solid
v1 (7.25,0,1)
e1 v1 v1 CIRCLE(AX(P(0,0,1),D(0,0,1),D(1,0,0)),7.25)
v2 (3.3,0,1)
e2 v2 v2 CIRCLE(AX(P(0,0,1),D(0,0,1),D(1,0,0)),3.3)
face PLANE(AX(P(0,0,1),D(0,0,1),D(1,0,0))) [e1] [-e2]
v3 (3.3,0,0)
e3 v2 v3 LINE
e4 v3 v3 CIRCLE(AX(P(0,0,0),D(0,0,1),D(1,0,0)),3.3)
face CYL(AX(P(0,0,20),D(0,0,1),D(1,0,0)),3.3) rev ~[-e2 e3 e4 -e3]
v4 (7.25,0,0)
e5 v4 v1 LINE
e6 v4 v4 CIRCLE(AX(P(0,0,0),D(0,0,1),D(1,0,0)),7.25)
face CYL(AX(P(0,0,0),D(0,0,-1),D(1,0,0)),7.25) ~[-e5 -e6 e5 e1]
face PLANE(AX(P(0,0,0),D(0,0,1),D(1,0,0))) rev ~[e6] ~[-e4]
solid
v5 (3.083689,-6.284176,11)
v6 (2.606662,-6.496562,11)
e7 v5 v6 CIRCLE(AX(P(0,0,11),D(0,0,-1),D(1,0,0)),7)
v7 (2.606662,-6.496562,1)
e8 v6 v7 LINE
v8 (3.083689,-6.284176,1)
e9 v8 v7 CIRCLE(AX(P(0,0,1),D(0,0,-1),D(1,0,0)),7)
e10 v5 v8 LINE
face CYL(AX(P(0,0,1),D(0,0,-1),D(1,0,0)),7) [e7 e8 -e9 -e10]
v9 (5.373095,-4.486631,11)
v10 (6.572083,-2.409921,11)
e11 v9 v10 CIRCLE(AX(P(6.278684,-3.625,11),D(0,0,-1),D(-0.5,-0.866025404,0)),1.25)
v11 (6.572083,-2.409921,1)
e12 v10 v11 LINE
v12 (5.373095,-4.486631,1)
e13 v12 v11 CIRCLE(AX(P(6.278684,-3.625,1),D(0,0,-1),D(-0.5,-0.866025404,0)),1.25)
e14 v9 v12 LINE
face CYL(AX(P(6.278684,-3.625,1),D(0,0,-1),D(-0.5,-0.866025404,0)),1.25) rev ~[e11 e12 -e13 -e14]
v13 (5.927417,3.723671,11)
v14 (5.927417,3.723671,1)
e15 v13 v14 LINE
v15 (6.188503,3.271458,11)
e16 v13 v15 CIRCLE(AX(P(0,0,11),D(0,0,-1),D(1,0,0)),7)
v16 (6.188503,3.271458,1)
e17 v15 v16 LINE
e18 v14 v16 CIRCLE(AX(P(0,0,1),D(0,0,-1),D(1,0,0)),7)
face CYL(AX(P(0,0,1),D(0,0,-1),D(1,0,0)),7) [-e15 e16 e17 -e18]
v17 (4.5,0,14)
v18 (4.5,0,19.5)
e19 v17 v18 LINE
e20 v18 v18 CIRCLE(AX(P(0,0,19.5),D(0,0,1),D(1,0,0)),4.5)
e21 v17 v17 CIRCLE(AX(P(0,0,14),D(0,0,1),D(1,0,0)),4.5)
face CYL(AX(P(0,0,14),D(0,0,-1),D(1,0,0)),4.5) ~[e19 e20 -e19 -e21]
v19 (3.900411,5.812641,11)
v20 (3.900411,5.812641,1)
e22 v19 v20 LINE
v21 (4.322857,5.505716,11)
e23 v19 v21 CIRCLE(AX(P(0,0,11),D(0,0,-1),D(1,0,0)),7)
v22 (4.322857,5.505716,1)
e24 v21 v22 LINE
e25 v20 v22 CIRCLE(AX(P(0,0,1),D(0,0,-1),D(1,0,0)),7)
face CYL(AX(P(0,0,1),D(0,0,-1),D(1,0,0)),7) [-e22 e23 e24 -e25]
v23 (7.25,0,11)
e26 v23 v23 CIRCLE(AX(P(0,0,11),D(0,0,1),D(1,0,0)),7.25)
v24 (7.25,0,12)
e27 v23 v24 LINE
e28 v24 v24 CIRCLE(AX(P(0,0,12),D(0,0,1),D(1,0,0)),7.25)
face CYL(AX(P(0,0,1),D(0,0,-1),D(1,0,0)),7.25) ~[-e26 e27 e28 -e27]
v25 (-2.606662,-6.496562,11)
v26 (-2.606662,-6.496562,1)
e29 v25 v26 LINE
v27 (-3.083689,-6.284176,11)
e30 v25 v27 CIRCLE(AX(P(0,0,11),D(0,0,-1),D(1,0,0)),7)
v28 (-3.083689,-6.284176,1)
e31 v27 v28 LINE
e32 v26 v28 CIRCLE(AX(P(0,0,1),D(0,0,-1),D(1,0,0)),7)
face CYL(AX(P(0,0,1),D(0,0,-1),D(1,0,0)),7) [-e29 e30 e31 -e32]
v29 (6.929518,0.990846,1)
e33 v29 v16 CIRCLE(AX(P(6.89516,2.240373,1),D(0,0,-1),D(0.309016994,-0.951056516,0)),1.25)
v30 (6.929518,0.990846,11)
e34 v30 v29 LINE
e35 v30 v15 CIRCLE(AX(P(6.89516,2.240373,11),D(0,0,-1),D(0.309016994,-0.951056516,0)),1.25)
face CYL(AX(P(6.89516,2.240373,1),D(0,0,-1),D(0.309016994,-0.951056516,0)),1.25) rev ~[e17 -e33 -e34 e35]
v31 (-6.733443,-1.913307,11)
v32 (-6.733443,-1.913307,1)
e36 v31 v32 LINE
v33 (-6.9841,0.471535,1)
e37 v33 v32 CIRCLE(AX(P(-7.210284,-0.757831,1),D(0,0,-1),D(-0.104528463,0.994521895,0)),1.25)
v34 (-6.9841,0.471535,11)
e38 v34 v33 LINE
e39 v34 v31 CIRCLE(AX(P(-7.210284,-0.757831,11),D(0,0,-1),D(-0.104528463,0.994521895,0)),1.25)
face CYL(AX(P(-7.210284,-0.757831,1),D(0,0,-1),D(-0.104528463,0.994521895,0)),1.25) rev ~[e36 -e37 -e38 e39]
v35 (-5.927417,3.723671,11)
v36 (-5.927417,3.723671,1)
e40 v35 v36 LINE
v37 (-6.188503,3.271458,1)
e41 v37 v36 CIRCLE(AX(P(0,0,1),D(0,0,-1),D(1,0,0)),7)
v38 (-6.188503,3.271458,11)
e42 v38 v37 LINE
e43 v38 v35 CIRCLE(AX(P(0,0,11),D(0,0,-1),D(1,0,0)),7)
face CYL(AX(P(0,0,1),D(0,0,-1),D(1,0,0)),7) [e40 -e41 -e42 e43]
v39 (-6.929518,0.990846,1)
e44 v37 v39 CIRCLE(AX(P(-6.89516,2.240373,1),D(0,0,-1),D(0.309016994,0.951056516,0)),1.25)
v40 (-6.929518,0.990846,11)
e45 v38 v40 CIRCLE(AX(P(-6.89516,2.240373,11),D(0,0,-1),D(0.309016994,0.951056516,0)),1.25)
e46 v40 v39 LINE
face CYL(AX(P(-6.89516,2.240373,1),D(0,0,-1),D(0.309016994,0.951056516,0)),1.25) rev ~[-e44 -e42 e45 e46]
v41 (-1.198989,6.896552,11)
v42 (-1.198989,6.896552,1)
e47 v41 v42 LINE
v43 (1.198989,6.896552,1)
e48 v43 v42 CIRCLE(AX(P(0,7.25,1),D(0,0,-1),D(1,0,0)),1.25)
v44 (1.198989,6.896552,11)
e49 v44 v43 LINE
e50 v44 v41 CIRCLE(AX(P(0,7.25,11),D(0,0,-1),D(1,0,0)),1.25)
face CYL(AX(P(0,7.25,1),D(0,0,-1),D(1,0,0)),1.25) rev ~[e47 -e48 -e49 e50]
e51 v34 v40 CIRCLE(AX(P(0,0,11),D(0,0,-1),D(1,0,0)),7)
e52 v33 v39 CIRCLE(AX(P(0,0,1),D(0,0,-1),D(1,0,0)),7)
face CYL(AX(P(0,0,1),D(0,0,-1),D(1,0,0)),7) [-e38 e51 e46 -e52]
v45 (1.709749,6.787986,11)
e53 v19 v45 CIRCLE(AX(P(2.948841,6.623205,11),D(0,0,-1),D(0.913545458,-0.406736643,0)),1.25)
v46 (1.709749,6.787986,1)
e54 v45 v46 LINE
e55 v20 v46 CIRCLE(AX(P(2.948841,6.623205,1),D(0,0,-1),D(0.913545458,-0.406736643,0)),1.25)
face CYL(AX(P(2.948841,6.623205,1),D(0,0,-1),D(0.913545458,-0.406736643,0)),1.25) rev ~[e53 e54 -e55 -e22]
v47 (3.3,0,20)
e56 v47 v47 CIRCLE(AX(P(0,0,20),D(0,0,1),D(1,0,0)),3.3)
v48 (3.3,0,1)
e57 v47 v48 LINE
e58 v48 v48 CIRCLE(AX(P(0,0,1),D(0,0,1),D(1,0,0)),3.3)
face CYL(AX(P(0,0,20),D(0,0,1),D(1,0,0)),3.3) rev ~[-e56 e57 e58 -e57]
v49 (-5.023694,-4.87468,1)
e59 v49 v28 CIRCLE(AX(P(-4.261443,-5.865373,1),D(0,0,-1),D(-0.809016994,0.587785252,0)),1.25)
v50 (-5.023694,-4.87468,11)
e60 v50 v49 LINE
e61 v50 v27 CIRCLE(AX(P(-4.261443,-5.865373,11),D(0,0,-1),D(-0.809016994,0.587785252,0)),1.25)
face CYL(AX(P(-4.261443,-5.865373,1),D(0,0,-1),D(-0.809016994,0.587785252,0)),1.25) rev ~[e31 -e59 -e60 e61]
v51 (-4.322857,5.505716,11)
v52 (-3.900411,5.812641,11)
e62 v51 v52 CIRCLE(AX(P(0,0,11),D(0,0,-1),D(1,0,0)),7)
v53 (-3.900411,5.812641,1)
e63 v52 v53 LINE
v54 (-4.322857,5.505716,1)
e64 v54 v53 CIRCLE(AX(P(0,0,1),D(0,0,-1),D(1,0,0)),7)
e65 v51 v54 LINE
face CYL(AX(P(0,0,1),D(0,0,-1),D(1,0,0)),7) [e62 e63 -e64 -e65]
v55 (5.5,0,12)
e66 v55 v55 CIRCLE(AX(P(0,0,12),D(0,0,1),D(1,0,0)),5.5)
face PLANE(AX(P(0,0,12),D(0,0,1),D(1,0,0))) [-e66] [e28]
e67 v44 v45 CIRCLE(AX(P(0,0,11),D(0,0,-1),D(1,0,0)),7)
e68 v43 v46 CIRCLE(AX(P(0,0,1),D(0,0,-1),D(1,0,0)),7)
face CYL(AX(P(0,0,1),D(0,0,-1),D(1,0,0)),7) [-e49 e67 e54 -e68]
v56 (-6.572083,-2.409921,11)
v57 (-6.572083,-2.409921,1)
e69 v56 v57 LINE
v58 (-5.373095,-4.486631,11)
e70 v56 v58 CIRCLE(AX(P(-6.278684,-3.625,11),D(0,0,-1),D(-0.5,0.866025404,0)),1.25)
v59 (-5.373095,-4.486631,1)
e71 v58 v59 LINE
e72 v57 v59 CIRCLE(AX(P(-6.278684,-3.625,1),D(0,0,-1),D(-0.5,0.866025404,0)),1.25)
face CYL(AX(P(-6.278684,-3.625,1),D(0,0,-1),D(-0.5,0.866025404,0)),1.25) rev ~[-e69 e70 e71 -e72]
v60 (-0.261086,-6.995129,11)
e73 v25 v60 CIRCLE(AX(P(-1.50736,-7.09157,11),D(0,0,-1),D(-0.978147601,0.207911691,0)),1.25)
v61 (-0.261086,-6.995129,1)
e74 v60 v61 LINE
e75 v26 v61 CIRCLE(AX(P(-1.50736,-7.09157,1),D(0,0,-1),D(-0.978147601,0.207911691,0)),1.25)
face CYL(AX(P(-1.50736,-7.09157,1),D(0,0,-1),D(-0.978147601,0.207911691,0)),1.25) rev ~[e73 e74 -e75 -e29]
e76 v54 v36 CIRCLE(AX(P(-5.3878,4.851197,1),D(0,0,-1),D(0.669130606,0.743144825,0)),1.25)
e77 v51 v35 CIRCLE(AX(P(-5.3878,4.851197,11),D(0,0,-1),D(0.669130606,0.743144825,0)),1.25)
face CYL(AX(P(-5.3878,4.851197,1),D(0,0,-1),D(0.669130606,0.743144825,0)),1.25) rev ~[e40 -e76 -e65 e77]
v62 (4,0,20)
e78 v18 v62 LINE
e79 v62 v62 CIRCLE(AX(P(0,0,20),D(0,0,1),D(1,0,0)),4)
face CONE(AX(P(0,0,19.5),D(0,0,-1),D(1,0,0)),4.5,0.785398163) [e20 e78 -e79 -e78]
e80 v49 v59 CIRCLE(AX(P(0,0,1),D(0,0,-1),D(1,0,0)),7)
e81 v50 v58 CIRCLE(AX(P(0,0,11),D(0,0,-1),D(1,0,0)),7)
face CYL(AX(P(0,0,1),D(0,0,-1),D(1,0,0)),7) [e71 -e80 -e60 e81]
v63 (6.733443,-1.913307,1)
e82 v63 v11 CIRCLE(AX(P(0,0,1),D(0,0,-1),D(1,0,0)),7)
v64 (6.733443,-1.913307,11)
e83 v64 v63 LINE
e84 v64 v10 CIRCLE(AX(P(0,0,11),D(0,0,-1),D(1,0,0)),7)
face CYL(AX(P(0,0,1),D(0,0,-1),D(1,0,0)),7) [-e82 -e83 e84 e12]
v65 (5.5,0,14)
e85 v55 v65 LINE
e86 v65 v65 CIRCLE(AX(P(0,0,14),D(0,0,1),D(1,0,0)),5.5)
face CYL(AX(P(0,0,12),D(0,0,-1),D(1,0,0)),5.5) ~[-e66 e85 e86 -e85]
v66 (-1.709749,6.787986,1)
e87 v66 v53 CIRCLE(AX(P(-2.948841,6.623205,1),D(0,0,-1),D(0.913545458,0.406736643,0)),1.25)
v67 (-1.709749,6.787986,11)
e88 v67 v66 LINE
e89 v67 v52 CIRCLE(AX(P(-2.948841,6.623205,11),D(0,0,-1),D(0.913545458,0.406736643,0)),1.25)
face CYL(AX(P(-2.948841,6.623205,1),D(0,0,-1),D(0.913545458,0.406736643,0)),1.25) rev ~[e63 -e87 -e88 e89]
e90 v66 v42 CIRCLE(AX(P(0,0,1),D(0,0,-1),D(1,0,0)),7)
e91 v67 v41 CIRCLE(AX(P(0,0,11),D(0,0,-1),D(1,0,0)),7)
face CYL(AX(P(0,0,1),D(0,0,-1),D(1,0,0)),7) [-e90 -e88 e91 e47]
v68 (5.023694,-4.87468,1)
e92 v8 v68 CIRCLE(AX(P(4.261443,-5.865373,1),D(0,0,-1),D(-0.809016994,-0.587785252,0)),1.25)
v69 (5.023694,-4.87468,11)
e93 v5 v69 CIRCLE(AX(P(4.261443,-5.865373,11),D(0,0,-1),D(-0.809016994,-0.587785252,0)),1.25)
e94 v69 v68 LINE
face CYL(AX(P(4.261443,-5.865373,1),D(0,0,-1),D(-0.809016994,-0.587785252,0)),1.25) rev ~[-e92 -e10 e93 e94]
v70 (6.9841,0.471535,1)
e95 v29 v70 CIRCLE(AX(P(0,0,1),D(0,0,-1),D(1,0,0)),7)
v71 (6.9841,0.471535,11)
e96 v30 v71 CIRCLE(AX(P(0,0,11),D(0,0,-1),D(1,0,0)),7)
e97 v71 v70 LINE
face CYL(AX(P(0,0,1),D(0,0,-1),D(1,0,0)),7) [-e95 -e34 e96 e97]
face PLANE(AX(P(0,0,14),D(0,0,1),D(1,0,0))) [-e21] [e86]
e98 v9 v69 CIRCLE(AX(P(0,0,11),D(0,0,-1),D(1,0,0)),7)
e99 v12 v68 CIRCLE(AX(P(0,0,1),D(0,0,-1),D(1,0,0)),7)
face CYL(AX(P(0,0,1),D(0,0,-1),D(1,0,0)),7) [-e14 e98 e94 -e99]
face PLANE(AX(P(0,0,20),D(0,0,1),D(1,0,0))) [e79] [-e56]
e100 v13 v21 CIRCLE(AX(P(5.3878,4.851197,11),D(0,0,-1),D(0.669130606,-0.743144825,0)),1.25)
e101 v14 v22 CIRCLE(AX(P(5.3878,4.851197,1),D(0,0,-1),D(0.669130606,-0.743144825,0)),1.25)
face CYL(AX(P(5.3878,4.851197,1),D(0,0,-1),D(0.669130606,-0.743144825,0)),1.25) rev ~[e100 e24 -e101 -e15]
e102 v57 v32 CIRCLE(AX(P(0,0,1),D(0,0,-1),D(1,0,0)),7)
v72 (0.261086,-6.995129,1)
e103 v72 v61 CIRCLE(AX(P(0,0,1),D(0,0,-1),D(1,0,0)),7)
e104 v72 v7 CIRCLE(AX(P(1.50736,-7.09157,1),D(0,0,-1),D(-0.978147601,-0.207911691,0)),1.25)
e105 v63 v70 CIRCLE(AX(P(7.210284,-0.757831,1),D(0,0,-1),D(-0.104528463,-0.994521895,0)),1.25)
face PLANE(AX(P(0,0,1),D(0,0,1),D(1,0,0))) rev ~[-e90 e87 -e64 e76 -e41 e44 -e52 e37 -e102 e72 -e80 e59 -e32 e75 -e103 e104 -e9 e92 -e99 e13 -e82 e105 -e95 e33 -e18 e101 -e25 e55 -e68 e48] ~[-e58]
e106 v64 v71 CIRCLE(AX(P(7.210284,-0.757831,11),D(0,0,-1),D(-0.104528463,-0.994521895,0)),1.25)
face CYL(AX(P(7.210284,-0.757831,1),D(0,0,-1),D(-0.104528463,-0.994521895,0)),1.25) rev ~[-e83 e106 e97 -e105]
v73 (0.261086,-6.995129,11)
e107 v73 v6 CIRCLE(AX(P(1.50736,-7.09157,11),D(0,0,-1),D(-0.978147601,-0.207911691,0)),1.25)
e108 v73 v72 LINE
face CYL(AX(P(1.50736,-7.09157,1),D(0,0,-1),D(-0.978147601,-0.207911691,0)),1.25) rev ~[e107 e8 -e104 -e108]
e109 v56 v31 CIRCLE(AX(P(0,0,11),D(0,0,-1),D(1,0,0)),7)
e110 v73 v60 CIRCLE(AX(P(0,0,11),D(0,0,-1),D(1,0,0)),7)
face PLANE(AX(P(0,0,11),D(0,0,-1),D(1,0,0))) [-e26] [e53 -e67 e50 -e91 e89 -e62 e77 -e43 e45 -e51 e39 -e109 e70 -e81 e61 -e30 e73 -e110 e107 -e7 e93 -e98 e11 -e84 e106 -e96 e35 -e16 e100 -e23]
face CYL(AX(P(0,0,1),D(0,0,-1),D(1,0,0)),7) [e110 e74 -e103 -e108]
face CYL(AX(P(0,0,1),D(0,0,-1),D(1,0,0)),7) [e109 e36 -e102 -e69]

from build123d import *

# Parameters (mm, degrees)
F0_R            = 7.25
F1_DEPTH        = 1
F2_R            = 7.25
F3_DEPTH        = 11
F4_R            = 1.25
F5_DEPTH        = 10
F5_COPIES_COUNT = 15
F6_R            = 7.25
F6_R_2          = 7
F7_DEPTH        = 10
F8_R            = 5.5
F9_DEPTH        = 2
F10_R           = 4.5
F11_DEPTH       = 6
F12_R           = 3.3
F13_DEPTH       = 25
F14_SIZE        = 0.5


# Not quite as in the source:
# - a pattern or mirror of a feature is missing from the dataset's text; its kind, count and spacing are read off the source's solid


with BuildPart() as f1:
    # F0 (on Top) → F1 (new body)
    with BuildSketch(Plane.XY):
        Circle(F0_R)
    extrude(amount=F1_DEPTH)


with BuildPart() as f3:
    # F2 (on face) → F3 (new body)
    with BuildSketch(Plane.XY.offset(1)):
        Circle(F2_R)
    extrude(amount=F3_DEPTH)

    # F4 (on face) → F5 (cut)
    with BuildSketch(Plane(origin=(0, 0, 1), x_dir=(1, 0, 0), z_dir=(0, 0, -1))):
        with Locations((0, -7.25)):
            Circle(F4_R)
    f5 = extrude(amount=-F5_DEPTH, mode=Mode.SUBTRACT)

    # F5_copies: F5 ×15 about axis
    f5_copies_axis = Axis((0, 0, 0), (0, 0, 1))
    for i in range(1, F5_COPIES_COUNT):
        add(f5.rotate(f5_copies_axis, i * 360 / F5_COPIES_COUNT), mode=Mode.SUBTRACT)

    # F6 (on face) → F7 (cut)
    with BuildSketch(Plane(origin=(0, 0, 1), x_dir=(1, 0, 0), z_dir=(0, 0, -1))):
        Circle(F6_R)
        Circle(F6_R_2, mode=Mode.SUBTRACT)
    extrude(amount=-F7_DEPTH, mode=Mode.SUBTRACT)

    # F8 (on face) → F9 (join)
    with BuildSketch(Plane.XY.offset(12)):
        Circle(F8_R)
    extrude(amount=F9_DEPTH)

    # F10 (on face) → F11 (join)
    with BuildSketch(Plane.XY.offset(14)):
        Circle(F10_R)
    extrude(amount=F11_DEPTH)


with BuildPart() as f13_tool:
    # F12 (on face) → F13 (new body)
    with BuildSketch(Plane.XY.offset(20)):
        Circle(F12_R)
    extrude(amount=-F13_DEPTH)


with BuildPart() as f1_1:
    add(f1.part)

    # F13: cut by f13_tool
    add(f13_tool.part, mode=Mode.SUBTRACT)


with BuildPart() as f3_1:
    add(f3.part)

    # F13: cut by f13_tool
    add(f13_tool.part, mode=Mode.SUBTRACT)

    # F14
    f14_edges = [f3_1.edges().sort_by_distance(p)[0] for p in [
        (-4.5, 0, 20),
    ]]
    chamfer(f14_edges, length=F14_SIZE)


solid = Compound([f1_1.part, f3_1.part])
